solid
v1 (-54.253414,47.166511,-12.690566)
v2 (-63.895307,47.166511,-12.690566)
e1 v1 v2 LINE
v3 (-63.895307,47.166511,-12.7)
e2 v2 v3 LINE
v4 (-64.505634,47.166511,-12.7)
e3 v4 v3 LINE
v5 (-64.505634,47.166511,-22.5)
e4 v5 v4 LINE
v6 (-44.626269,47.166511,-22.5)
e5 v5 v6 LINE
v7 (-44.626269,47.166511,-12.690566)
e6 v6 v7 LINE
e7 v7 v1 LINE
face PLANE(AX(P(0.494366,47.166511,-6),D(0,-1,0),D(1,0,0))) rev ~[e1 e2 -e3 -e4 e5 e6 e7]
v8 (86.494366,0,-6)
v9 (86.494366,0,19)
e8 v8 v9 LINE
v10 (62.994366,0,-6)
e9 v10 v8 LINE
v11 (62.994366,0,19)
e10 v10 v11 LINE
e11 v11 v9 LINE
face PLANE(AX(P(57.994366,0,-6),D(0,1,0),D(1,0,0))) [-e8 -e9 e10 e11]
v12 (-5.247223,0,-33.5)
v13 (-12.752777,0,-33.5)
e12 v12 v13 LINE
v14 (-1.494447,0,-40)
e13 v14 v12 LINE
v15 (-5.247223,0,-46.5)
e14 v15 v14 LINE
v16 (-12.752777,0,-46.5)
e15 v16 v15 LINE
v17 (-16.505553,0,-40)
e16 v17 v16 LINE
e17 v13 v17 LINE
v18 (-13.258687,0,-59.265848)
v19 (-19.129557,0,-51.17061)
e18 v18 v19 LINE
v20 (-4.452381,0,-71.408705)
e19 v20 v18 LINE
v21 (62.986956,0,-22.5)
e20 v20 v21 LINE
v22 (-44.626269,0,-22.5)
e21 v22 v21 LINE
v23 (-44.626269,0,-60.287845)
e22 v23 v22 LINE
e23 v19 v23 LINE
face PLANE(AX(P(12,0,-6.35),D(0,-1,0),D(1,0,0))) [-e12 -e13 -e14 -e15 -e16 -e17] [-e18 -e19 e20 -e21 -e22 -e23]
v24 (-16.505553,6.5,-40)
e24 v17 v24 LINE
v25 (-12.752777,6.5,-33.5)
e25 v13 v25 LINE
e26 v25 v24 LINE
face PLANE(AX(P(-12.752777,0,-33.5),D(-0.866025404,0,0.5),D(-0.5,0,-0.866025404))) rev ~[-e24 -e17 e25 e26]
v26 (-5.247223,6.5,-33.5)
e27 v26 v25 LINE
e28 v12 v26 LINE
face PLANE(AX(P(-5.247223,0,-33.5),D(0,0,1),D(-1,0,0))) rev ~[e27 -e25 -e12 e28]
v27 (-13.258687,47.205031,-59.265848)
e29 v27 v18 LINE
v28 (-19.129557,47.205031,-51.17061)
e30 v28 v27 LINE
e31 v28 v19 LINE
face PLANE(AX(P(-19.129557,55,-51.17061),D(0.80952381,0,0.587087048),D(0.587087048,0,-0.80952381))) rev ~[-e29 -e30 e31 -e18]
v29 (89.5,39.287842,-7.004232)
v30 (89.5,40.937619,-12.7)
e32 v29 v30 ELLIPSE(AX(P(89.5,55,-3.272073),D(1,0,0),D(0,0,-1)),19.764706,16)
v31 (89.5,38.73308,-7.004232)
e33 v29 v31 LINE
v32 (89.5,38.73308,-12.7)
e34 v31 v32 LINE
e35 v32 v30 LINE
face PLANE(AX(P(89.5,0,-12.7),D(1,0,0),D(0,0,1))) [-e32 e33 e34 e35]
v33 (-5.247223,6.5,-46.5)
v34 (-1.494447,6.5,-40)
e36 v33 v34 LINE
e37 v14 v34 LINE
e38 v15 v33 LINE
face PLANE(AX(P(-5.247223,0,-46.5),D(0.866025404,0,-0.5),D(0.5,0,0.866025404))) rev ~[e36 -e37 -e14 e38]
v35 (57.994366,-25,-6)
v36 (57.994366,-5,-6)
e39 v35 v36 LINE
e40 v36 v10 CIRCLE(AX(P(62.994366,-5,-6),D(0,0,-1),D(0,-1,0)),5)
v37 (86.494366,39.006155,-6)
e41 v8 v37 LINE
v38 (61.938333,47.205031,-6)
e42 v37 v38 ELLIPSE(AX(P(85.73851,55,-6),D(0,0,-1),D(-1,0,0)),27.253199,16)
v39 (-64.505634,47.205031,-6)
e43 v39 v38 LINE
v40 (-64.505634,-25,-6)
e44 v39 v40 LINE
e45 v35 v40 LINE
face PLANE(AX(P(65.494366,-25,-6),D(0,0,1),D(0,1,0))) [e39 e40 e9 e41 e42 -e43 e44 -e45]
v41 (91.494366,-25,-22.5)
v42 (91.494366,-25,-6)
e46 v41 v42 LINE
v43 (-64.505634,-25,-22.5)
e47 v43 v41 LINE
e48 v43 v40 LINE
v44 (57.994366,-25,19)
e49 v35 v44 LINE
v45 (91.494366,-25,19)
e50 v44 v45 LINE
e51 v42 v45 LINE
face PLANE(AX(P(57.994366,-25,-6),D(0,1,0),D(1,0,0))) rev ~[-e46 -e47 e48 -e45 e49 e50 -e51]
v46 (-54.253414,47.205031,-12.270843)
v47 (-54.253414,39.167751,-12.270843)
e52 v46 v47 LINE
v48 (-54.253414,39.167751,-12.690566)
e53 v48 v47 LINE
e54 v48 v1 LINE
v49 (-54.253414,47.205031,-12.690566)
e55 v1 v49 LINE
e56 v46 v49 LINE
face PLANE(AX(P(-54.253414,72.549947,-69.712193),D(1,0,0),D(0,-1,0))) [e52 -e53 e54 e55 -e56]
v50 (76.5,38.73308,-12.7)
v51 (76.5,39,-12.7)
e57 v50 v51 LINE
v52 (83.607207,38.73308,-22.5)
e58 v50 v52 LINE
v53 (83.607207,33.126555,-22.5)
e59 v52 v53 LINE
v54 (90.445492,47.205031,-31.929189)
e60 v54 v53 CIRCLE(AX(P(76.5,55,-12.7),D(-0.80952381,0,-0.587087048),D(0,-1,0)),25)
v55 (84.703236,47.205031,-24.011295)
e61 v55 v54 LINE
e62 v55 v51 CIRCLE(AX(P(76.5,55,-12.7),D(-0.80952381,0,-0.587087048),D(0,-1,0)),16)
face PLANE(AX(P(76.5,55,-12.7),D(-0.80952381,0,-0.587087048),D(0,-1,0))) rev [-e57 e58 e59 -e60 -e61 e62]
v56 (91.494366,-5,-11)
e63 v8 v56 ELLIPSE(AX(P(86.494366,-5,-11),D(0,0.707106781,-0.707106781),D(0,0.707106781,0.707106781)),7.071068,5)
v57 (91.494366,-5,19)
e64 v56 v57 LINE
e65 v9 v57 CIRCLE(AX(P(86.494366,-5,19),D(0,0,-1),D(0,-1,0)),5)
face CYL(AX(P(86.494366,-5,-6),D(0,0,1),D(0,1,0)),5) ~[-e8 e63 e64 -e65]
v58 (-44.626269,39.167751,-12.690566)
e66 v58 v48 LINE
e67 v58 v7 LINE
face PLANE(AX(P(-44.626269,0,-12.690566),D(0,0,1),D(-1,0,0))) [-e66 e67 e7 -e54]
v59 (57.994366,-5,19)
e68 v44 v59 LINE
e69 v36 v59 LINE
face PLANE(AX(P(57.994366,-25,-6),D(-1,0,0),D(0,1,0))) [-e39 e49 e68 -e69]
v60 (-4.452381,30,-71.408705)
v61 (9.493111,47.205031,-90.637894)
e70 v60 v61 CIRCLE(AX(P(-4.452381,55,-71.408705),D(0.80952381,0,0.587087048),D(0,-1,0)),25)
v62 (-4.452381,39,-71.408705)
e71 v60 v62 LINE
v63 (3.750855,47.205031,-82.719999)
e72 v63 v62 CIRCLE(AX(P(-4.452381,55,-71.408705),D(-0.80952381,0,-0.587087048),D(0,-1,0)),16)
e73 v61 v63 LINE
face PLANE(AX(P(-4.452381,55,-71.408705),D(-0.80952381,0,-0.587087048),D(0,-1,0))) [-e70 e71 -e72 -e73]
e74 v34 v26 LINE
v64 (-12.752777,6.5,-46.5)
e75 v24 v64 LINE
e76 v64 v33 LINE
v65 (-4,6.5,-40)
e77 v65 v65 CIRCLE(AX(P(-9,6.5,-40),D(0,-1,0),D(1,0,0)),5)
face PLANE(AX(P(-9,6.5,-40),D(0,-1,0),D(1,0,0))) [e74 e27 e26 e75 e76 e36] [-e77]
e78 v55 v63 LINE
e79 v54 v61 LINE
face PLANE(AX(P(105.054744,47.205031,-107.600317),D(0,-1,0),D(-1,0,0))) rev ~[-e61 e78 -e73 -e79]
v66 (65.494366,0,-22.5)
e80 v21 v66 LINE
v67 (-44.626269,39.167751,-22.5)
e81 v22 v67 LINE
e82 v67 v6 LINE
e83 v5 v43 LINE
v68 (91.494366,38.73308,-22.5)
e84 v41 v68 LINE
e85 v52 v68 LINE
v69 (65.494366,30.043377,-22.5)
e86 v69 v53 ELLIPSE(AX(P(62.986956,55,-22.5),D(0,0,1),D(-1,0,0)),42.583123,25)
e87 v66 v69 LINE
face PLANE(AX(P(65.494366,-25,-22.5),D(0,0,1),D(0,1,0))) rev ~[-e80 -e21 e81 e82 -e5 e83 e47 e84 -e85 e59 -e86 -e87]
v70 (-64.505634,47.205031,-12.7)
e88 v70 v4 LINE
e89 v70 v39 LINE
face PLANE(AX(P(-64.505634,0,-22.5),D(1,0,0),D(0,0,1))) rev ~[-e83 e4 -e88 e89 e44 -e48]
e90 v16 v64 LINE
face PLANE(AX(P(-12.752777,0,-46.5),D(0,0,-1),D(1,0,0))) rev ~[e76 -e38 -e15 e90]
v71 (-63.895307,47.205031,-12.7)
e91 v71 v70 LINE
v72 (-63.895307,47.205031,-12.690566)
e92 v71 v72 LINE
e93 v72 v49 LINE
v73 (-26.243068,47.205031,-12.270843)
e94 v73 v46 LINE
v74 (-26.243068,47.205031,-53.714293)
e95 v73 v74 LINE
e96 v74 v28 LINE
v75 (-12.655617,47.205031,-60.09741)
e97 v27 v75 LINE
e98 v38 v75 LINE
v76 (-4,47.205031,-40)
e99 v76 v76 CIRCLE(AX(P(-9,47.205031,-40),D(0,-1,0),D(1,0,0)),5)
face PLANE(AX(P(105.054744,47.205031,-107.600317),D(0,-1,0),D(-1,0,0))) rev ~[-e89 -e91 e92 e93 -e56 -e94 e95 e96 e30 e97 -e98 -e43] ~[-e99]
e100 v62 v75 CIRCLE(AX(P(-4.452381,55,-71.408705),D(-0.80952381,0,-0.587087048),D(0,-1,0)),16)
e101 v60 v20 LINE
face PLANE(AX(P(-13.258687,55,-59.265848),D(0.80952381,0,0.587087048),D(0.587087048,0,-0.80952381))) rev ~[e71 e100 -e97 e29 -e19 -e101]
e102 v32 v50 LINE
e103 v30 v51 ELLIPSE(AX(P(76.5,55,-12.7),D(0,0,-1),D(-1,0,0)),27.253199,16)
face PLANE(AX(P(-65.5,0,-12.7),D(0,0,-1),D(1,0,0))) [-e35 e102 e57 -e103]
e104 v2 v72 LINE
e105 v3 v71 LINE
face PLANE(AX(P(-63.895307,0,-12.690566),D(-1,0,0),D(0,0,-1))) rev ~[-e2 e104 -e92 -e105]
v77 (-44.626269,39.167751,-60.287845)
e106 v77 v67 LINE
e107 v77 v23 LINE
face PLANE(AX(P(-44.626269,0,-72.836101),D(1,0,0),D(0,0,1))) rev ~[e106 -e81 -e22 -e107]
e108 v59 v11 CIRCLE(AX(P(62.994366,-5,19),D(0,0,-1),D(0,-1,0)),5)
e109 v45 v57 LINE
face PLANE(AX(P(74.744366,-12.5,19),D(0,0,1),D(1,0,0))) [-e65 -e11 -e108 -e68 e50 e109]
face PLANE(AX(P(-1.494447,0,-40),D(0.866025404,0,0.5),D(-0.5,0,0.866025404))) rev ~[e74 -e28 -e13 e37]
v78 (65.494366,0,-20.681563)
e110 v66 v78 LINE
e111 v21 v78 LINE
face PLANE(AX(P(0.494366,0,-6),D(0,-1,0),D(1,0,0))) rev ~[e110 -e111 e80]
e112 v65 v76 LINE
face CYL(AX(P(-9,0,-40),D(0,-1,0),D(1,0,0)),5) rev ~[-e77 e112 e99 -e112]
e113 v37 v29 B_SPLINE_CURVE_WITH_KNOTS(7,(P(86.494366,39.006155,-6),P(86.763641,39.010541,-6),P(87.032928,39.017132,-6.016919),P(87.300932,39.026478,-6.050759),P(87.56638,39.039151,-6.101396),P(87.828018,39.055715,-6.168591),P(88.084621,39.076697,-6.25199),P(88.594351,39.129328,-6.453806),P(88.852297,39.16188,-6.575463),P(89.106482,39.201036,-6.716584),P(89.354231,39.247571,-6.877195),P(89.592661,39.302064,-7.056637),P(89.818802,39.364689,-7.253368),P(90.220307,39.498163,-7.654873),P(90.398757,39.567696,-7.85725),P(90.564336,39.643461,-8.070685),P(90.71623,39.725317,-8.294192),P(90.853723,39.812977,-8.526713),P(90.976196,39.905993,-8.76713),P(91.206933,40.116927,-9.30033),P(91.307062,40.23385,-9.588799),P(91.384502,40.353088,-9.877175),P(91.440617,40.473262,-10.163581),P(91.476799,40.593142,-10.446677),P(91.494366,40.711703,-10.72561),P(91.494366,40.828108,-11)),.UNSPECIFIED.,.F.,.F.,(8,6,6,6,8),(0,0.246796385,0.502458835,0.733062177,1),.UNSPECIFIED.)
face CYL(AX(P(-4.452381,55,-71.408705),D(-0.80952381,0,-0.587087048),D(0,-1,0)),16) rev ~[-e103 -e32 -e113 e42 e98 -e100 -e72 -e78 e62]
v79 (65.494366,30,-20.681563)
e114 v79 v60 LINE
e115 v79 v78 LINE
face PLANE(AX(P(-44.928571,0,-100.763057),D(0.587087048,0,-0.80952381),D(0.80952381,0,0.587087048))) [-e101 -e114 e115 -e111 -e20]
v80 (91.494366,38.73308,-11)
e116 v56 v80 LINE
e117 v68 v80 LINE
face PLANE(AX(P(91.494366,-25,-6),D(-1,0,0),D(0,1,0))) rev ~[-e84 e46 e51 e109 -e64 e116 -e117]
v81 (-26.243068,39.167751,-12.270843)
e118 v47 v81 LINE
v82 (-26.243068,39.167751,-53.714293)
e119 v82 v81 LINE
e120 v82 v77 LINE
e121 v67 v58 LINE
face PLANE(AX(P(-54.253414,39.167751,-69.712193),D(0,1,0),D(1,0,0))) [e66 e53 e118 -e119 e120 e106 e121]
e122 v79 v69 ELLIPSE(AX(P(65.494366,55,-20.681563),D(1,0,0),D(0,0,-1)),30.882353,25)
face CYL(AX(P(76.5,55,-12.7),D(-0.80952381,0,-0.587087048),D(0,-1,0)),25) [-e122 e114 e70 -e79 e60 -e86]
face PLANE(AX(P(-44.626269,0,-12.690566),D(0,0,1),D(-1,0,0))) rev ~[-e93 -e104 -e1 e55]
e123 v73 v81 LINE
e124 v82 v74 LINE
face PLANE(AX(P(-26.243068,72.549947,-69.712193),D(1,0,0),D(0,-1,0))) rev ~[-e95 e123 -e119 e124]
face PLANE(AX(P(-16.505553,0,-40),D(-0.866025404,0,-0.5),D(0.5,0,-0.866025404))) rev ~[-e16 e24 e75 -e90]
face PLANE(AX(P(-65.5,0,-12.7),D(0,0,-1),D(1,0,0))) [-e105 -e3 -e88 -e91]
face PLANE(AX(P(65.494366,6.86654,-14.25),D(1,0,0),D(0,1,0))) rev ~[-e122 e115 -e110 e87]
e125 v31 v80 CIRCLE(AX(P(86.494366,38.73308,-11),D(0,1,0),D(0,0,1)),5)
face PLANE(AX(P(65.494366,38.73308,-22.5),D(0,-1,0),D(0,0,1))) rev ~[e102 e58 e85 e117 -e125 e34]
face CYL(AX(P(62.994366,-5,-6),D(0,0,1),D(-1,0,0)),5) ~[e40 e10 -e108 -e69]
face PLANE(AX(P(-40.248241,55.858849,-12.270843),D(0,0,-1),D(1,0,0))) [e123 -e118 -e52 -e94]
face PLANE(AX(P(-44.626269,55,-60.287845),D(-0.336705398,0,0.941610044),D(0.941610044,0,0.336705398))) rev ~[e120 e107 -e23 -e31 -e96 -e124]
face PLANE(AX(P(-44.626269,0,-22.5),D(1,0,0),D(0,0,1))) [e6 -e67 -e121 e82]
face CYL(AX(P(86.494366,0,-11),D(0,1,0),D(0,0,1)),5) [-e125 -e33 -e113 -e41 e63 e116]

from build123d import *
from build123d import SkipClean  # not in build123d's __all__

# Parameters (mm, degrees)
F0_W      = 131
F0_H      = 155.25
F0_R      = 5
F0_R_2    = 10
F1_DEPTH  = 12.7
F2_DEPTH  = 150
F3_R      = 4.7625
F4_DEPTH  = 167.951
F6_DEPTH  = 55
F9_W      = 46.4503765106
F9_H      = 23.6088857055
F10_DEPTH = 100.6187200546
F12_DEPTH = 150.001
F14_DEPTH = 89.0000760555
F15_R     = 16
F16_DEPTH = 210.4837932836
F18_W     = 28.0103459954
F18_H     = 33.3821959794
F19_DEPTH = 57.4413500726
F23_DEPTH = 37.3063087463
F25_DEPTH = 262.8513174901
F26_W     = 130
F26_H     = 33
F27_DEPTH = 25
F28_DEPTH = 47.1665114164
F29_W     = 130
F29_H     = 16.5
F30_DEPTH = 118.0664598942
F32_DEPTH = 6.5
F33_R     = 5
F34_DEPTH = 47.2060309181
F35_W     = 63.7330800295
F35_H     = 16.5
F36_DEPTH = 26
F37_W     = 33.5
F37_H     = 25
F38_DEPTH = 25
F39_R     = 5
F41_DEPTH = 150.837957859


with BuildPart() as f1:
    # F0 (on Front) → F1 (new body)
    with BuildSketch(Plane.XZ):
        with Locations((0, 77.625)):
            Rectangle(F0_W, F0_H)
        with Locations((-32.75, 57)):
            Circle(F0_R, mode=Mode.SUBTRACT)
        with Locations((32.75, 57)):
            Circle(F0_R, mode=Mode.SUBTRACT)
        with Locations((0, 89.75)):
            Circle(F0_R_2, mode=Mode.SUBTRACT)
        with Locations((-32.75, 122.5)):
            Circle(F0_R, mode=Mode.SUBTRACT)
        with Locations((32.75, 122.5)):
            Circle(F0_R, mode=Mode.SUBTRACT)
    extrude(amount=-F1_DEPTH)

    # F0 (on Front) → F2 (join)
    with BuildSketch(Plane.XZ):
        Polygon((89.5, 0), (65.5, 0), (-65.5, 0), (-65.5, -12.7), (89.5, -12.7), align=None)
    extrude(amount=-F2_DEPTH)

    # F3 (on face) → F4 (cut, through all)
    with BuildSketch(Plane(origin=(0, 0, -12.7), x_dir=(1, 0, 0), z_dir=(0, 0, -1))):
        with Locations((-40, -55.7)):
            Circle(F3_R)
        with Locations((-40, -118.2)):
            Circle(F3_R)
        with Locations((64, -118.2)):
            Circle(F3_R)
        with Locations((64, -55.7)):
            Circle(F3_R)
    extrude(amount=-F4_DEPTH, mode=Mode.SUBTRACT)

    # F5 (on face) → F6 (join)
    with BuildSketch(Plane.XZ):
        Polygon((76.5, -12.7), (-63.5, -12.7), (-44.9285714286, -100.7630571853), align=None)
    extrude(amount=-F6_DEPTH)

    # F7 (on face) → F8 (revolve)
    with BuildSketch(Plane(origin=(32.4031609217, 0, -44.6801379177), x_dir=(0.8095238095, 0, 0.5870870479), z_dir=(0.5870870479, 0, -0.8095238095))):
        Polygon((18.2698592544, -40), (54.4725659202, -40), (54.4725659202, -30), (-45.5274340798, -30), (-45.5274340798, -40), align=None)
    revolve(axis=Axis((36.0238095238, 55, -42.0543523951), (-0.8095238095, 0, -0.5870870479)))

    # F9 (on face) → F10 (cut)
    with BuildSketch(Plane.YZ.offset(89.5)):
        with Locations((57.3695674539, 11.8044428527)):
            Rectangle(F9_W, F9_H)
    extrude(amount=-F10_DEPTH, mode=Mode.SUBTRACT)

    # F11 (on Front) → F12 (cut, through all)
    with BuildSketch(Plane.XZ):
        Polygon((-55.6169226766, -72.8361010551), (-44.6262694895, -72.8361010551), (-44.6262694895, -12.6905664802), (-63.8953074813, -12.6905664802), (-63.8953074813, -72.8361010551), align=None)
        Polygon((-4.5890193433, -104.113265872), (-4.5890193433, -72.8361010551), (-44.6262694895, -72.8361010551), (-55.6169226766, -72.8361010551), (-55.6169226766, -104.113265872), align=None)
    extrude(amount=-F12_DEPTH, mode=Mode.SUBTRACT)

    # F13 (on face) → F14 (cut)
    with BuildSketch(Plane(origin=(0, 55, 0), x_dir=(-1, 0, 0), z_dir=(0, 1, 0))):
        Polygon((76.3912552581, -71.6465198879), (44.6262694895, -60.2878452083), (44.6262694895, -72.8361010551), (6.4205920826, -72.8361010551), (4.4523809524, -71.4087047902), (-10.0519139283, -91.4084170785), (37.2047263411, -125.6801223738), align=None)
        Polygon((44.6262694895, -60.2878452083), (19.1295571499, -51.1706095521), (13.2586866709, -59.2658476473), (4.4523809524, -71.4087047902), (6.4205920826, -72.8361010551), (44.6262694895, -72.8361010551), align=None)
    extrude(amount=-F14_DEPTH, mode=Mode.SUBTRACT)

    # F15 (on face) → F16 (cut, through all)
    with BuildSketch(Plane(origin=(-36.8555418741, 0, -26.7285668724), x_dir=(0, -1, 0), z_dir=(-0.8095238095, 0, -0.5870870479))):
        with Locations((-55, -55.1931115454)):
            Circle(F15_R)
        with BuildLine():
            ThreePointArc((-40, -55.1931115454), (-65.6066017178, -65.7997132632), (-55, -40.1931115454))
            Line((-55, -40.1931115454), (-55, -55.1931115454))
            Line((-55, -55.1931115454), (-40, -55.1931115454))
        make_face(mode=Mode.SUBTRACT)
        with BuildLine():
            Line((-55, -55.1931115454), (-55, -40.1931115454))
            ThreePointArc((-55, -40.1931115454), (-65.6066017178, -65.7997132632), (-40, -55.1931115454))
            Line((-40, -55.1931115454), (-55, -55.1931115454))
        make_face()
    with SkipClean():  # cleaning this boolean's faces spoils the solid; the shape is the same uncleaned
        extrude(amount=-F16_DEPTH, mode=Mode.SUBTRACT)

    # F18 (on offset) → F19 (cut)
    with BuildSketch(Plane(origin=(0, 0, -69.7121929049), x_dir=(1, 0, 0), z_dir=(0, 0, -1))):
        with Locations((-40.2482412755, -55.8588486165)):
            Rectangle(F18_W, F18_H)
    with SkipClean():  # cleaning this boolean's faces spoils the solid; the shape is the same uncleaned
        extrude(amount=-F19_DEPTH, mode=Mode.SUBTRACT)

    # F22 (on offset) → F23 (join)
    with BuildSketch(Plane(origin=(0, 66.3563400507, 0), x_dir=(-1, 0, 0), z_dir=(0, 1, 0))):
        Polygon((-19.5, -25.368578732), (9.2864632607, -47.1396760544), (25.5, -47.1396760544), (25.5, -10.8354373375), (-19.5, -10.8354373375), align=None)
    with SkipClean():  # cleaning this boolean's faces spoils the solid; the shape is the same uncleaned
        extrude(amount=-F23_DEPTH)

    # F24 (on offset) → F25 (cut, through all)
    with BuildSketch(Plane(origin=(0, 0, -107.6003174901), x_dir=(1, 0, 0), z_dir=(0, 0, -1))):
        Polygon((105.054743588, -47.2050309181), (-70.2532827854, -47.2050309181), (-70.2532827854, -164.4858419895), (108.5324063897, -164.4858419895), align=None)
    extrude(amount=-F25_DEPTH, mode=Mode.SUBTRACT)

    # F26 (on Front) → F27 (join)
    with BuildSketch(Plane.XZ):
        with Locations((0.4943662184, -6)):
            Rectangle(F26_W, F26_H)
    extrude(amount=F27_DEPTH)

    # F28 (add): a face of the model
    f28_faces = [f1.faces().sort_by_distance(p)[0] for p in [
        (-54.5656671683, 0, -17.5954279167),
    ]]
    extrude(f28_faces, amount=F28_DEPTH)

    # F29 (on face) → F30 (cut)
    with BuildSketch(Plane.XZ.offset(25)):
        Polygon((65.4943662184, -6), (102.4388783057, -6), (114.364810288, 171.1933612823), (-95.0750373681, 171.1933612823), (-95.0750373681, -6), (-64.5056337816, -6), (-64.5056337816, 10.5), (65.4943662184, 10.5), align=None)
        with Locations((0.4943662184, 2.25)):
            Rectangle(F29_W, F29_H)
    extrude(amount=-F30_DEPTH, mode=Mode.SUBTRACT)

    # F31 (on face) → F32 (cut)
    with BuildSketch(Plane.XZ):
        Polygon((-12.7527767497, -46.5), (-5.2472232503, -46.5), (-1.4944465005, -40), (-5.2472232503, -33.5), (-12.7527767497, -33.5), (-16.5055534995, -40), align=None)
    extrude(amount=-F32_DEPTH, mode=Mode.SUBTRACT)

    # F33 (on face) → F34 (cut, through all)
    with BuildSketch(Plane.XZ):
        with Locations((-9, -40)):
            Circle(F33_R)
    extrude(amount=-F34_DEPTH, mode=Mode.SUBTRACT)

    # F35 (on face) → F36 (join)
    with BuildSketch(Plane.YZ.offset(65.4943662184)):
        with Locations((6.8665400147, -14.25)):
            Rectangle(F35_W, F35_H)
    extrude(amount=F36_DEPTH)

    # F37 (on face) → F38 (join)
    with BuildSketch(Plane.XY.offset(-6)):
        with Locations((74.7443662184, -12.5)):
            Rectangle(F37_W, F37_H)
    extrude(amount=F38_DEPTH)

    # F39
    f39_edges = [f1.edges().sort_by_distance(p)[0] for p in [
        (57.994366, 0, 6.5),
        (91.494366, 0, 6.5),
        (91.494366, 19.36654, -6),
    ]]
    fillet(f39_edges, radius=F39_R)

    # F40 (on face) → F41 (cut)
    with BuildSketch(Plane(origin=(0, 0, -22.5), x_dir=(1, 0, 0), z_dir=(0, 0, -1))):
        Polygon((-64.5056337816, -47.1665114164), (-64.5056337816, 25), (-82.232825458, 25), (-82.232825458, -50.1768067479), (-64.5056337816, -50.1768067479), align=None)
    extrude(amount=-F41_DEPTH, mode=Mode.SUBTRACT)


solid = f1.part
